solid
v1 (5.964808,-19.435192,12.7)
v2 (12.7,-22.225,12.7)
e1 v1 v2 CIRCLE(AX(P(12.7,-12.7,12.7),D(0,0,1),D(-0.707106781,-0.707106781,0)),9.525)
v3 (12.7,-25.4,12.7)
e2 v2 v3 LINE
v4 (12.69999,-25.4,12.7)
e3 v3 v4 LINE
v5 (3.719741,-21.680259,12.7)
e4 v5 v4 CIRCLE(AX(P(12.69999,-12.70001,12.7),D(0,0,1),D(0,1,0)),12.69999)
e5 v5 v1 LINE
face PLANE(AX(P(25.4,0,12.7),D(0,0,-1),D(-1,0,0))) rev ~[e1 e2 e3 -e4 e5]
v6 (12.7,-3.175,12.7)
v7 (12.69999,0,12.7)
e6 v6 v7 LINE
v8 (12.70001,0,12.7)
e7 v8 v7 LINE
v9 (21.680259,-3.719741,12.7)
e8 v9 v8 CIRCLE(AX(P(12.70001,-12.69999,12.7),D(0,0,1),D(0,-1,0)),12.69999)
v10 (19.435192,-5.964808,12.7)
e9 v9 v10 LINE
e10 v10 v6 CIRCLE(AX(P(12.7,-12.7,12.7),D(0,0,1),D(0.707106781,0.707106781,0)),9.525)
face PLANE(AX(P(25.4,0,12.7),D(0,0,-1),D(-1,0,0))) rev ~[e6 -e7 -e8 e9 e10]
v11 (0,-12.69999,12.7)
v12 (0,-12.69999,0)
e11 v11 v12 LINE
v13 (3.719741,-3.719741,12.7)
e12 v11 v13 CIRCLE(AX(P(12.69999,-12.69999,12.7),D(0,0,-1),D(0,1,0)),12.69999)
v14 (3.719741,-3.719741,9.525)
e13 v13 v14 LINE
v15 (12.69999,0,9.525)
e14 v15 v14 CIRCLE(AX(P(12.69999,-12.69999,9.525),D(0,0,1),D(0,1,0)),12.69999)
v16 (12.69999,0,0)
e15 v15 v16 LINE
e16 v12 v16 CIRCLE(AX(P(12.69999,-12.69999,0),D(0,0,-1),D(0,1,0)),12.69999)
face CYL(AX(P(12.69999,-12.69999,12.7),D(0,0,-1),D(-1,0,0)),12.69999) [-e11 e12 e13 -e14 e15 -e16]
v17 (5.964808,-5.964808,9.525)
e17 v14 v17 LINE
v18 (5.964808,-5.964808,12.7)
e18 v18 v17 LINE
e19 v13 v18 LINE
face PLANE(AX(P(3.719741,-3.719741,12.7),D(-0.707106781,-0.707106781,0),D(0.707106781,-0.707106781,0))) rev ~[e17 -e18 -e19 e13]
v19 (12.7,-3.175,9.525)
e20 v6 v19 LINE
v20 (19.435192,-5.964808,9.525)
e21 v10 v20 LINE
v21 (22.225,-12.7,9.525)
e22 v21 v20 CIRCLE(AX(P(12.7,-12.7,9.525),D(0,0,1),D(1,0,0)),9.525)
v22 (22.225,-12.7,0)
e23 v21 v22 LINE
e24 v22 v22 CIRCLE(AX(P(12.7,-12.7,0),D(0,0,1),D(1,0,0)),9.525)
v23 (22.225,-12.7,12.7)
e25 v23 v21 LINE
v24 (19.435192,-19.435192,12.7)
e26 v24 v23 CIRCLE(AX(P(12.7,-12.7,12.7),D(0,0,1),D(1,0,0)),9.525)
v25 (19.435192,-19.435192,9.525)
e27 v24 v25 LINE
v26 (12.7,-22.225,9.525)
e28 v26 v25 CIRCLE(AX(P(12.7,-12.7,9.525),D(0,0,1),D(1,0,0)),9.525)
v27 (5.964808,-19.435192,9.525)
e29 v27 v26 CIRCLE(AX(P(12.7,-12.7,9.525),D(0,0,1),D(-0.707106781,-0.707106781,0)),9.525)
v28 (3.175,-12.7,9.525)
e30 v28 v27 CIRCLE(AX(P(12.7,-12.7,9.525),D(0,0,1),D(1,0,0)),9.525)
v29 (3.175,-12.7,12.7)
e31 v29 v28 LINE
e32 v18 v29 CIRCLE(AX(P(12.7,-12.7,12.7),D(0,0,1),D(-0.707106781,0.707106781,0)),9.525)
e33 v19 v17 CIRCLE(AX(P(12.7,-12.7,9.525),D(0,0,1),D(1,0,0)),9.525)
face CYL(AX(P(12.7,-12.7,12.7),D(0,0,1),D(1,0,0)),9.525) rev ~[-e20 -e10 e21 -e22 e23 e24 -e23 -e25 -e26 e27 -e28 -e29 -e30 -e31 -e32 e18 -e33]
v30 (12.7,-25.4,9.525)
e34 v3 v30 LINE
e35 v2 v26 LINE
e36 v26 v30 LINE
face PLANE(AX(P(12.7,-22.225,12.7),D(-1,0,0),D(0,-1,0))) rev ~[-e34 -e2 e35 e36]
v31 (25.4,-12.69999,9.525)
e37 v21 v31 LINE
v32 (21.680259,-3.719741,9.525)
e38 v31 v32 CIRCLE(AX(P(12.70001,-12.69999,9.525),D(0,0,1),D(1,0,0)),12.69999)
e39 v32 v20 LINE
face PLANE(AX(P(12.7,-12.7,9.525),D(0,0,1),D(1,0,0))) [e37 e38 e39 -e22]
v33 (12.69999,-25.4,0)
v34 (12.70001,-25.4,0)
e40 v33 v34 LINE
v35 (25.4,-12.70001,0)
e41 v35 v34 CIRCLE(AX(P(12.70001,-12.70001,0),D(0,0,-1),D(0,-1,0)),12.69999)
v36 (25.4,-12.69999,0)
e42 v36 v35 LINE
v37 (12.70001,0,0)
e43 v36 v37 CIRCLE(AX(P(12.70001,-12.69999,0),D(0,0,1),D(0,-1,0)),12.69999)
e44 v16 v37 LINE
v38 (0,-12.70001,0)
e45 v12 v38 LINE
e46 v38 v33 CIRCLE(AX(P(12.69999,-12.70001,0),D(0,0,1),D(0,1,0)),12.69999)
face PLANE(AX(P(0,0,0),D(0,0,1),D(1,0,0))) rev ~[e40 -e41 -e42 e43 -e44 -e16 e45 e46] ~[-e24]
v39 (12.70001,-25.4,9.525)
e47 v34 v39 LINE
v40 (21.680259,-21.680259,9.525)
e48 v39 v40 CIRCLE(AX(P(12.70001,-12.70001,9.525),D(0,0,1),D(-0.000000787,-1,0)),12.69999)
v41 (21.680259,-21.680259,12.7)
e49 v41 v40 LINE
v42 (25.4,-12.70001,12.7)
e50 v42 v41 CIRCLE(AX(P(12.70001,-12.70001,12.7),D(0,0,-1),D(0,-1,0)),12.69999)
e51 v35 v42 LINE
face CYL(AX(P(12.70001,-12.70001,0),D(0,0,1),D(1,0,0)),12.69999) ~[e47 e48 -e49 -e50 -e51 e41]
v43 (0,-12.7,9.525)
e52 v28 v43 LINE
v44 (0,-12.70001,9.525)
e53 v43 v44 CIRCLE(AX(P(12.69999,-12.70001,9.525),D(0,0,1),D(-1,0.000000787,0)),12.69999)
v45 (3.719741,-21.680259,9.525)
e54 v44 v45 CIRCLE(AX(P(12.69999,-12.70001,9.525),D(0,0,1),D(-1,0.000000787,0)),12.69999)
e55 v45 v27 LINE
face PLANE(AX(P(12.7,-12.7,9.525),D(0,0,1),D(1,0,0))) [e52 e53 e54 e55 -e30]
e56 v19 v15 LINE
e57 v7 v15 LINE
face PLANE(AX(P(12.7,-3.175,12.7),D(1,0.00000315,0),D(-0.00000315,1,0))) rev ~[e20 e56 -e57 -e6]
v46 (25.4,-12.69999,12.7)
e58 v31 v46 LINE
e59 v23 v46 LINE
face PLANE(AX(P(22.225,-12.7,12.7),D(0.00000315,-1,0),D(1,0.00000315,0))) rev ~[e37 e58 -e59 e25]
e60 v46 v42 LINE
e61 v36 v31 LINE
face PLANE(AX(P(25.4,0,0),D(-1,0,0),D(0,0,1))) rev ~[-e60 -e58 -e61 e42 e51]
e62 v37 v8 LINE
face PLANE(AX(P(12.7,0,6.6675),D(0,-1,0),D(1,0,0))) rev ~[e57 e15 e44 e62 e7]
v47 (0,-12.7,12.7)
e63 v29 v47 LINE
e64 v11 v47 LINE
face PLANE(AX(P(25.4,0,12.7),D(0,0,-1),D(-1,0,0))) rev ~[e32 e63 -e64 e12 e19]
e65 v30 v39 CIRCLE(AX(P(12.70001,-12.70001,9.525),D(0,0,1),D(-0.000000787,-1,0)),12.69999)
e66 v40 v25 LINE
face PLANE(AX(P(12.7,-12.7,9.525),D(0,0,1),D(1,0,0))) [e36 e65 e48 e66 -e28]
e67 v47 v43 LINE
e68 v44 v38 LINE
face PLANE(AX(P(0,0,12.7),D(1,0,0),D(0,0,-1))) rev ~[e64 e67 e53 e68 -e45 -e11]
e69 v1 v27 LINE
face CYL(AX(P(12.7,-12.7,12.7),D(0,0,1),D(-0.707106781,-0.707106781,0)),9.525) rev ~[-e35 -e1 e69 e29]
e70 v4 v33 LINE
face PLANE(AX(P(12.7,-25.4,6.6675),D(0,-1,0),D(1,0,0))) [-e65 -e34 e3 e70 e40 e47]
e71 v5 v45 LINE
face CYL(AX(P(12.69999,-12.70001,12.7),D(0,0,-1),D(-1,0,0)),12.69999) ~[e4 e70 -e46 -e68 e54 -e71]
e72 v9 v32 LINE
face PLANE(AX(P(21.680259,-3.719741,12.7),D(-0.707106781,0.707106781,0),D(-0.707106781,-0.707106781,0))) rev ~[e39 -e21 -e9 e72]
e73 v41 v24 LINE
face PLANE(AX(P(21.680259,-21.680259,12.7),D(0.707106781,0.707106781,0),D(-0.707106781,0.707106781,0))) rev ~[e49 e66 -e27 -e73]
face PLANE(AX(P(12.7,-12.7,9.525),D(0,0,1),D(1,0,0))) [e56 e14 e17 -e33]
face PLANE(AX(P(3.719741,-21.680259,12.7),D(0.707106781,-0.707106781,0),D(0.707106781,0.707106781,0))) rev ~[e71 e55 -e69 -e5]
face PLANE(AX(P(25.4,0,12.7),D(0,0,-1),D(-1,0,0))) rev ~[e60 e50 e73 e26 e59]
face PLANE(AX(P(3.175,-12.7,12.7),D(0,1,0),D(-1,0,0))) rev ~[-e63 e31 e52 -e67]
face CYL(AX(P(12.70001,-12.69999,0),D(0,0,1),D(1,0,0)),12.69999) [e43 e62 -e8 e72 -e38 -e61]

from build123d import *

# Parameters (mm, degrees)
F0_W     = 5.08
F0_H     = 3.175
F1_DEPTH = 25.4
F2_R     = 12.69999
F3_R     = 9.525
F4_DEPTH = 12.701
F6_DEPTH = 3.175


# Not quite as in the source:
# - a fillet or chamfer is up to 0.001 mm smaller than in the source, because OpenCascade refuses the exact size
# - ends of sketch curves that miss each other by under 0.0002 mm in the source are joined


with BuildPart() as f1:
    # F0 (on Front) → F1 (new body)
    with BuildSketch(Plane.XZ):
        Polygon((25.4, 0), (25.4, 12.7), (20.32, 12.7), (20.32, 9.525), (15.24, 9.525), (15.24, 12.7), (10.16, 12.7), (10.16, 9.525), (5.08, 9.525), (5.08, 12.7), (0, 12.7), (0, 0), align=None)
        with Locations((17.78, 11.1125)):
            Rectangle(F0_W, F0_H)
        with Locations((7.62, 11.1125)):
            Rectangle(F0_W, F0_H)
    extrude(amount=F1_DEPTH)

    # F2 (radius 12.7 in the source; OpenCascade refuses exactly that, so slightly less here)
    f2_edges = [f1.edges().sort_by_distance(p)[0] for p in [
        (0, -25.4, 6.35),
        (25.4, -25.4, 6.35),
        (25.4, 0, 6.35),
        (0, 0, 6.35),
    ]]
    fillet(f2_edges, radius=F2_R)

    # F3 (on face) → F4 (cut, through all)
    with BuildSketch(Plane.XY.offset(12.7)):
        with Locations((12.7, -12.7)):
            Circle(F3_R)
    extrude(amount=-F4_DEPTH, mode=Mode.SUBTRACT)

    # F5 (on face) → F6 (cut)
    with BuildSketch(Plane.XY.offset(12.7)):
        with BuildLine():
            ThreePointArc((19.4351920908, -19.4351920908), (21.4999525472, -16.3450596933), (22.225, -12.7))
            ThreePointArc((22.225, -12.7), (21.4999525472, -9.0549403067), (19.4351920908, -5.9648079092))
            ThreePointArc((19.4351920908, -5.9648079092), (16.3450596933, -3.9000474528), (12.7, -3.175))
            ThreePointArc((12.7, -3.175), (9.0549403067, -3.9000474528), (5.9648079092, -5.9648079092))
            ThreePointArc((5.9648079092, -5.9648079092), (3.9000474528, -9.0549403067), (3.175, -12.7))
            ThreePointArc((3.175, -12.7), (3.9000474528, -16.3450596933), (5.9648079092, -19.4351920908))
            ThreePointArc((5.9648079092, -19.4351920908), (9.0549403067, -21.4999525472), (12.7, -22.225))
            ThreePointArc((12.7, -22.225), (16.3450596933, -21.4999525472), (19.4351920908, -19.4351920908))
        make_face()
        with BuildLine():
            ThreePointArc((12.69999, 0), (7.8399142358, -0.9667291759), (3.71974095, -3.71974095))
            Line((3.71974095, -3.71974095), (5.9648079092, -5.9648079092))
            ThreePointArc((5.9648079092, -5.9648079092), (9.0549403067, -3.9000474528), (12.7, -3.175))
            Line((12.7, -3.175), (12.69999, 0))
        make_face()
        with BuildLine():
            ThreePointArc((25.4, -12.69999), (24.4332708241, -7.8399142358), (21.68025905, -3.71974095))
            Line((21.68025905, -3.71974095), (19.4351920908, -5.9648079092))
            ThreePointArc((19.4351920908, -5.9648079092), (21.4999525472, -9.0549403067), (22.225, -12.7))
            Line((22.225, -12.7), (25.4, -12.69999))
        make_face()
        with BuildLine():
            Line((3.175, -12.7), (0, -12.7))
            ThreePointArc((0, -12.7), (0.9667291759, -17.5600857642), (3.71974095, -21.68025905))
            Line((3.71974095, -21.68025905), (5.9648079092, -19.4351920908))
            ThreePointArc((5.9648079092, -19.4351920908), (3.9000474528, -16.3450596933), (3.175, -12.7))
        make_face()
        with BuildLine():
            Line((12.7, -22.225), (12.7, -25.4))
            ThreePointArc((12.7, -25.4), (17.5600857642, -24.4332708241), (21.68025905, -21.68025905))
            Line((21.68025905, -21.68025905), (19.4351920908, -19.4351920908))
            ThreePointArc((19.4351920908, -19.4351920908), (16.3450596933, -21.4999525472), (12.7, -22.225))
        make_face()
    extrude(amount=-F6_DEPTH, mode=Mode.SUBTRACT)


solid = f1.part
